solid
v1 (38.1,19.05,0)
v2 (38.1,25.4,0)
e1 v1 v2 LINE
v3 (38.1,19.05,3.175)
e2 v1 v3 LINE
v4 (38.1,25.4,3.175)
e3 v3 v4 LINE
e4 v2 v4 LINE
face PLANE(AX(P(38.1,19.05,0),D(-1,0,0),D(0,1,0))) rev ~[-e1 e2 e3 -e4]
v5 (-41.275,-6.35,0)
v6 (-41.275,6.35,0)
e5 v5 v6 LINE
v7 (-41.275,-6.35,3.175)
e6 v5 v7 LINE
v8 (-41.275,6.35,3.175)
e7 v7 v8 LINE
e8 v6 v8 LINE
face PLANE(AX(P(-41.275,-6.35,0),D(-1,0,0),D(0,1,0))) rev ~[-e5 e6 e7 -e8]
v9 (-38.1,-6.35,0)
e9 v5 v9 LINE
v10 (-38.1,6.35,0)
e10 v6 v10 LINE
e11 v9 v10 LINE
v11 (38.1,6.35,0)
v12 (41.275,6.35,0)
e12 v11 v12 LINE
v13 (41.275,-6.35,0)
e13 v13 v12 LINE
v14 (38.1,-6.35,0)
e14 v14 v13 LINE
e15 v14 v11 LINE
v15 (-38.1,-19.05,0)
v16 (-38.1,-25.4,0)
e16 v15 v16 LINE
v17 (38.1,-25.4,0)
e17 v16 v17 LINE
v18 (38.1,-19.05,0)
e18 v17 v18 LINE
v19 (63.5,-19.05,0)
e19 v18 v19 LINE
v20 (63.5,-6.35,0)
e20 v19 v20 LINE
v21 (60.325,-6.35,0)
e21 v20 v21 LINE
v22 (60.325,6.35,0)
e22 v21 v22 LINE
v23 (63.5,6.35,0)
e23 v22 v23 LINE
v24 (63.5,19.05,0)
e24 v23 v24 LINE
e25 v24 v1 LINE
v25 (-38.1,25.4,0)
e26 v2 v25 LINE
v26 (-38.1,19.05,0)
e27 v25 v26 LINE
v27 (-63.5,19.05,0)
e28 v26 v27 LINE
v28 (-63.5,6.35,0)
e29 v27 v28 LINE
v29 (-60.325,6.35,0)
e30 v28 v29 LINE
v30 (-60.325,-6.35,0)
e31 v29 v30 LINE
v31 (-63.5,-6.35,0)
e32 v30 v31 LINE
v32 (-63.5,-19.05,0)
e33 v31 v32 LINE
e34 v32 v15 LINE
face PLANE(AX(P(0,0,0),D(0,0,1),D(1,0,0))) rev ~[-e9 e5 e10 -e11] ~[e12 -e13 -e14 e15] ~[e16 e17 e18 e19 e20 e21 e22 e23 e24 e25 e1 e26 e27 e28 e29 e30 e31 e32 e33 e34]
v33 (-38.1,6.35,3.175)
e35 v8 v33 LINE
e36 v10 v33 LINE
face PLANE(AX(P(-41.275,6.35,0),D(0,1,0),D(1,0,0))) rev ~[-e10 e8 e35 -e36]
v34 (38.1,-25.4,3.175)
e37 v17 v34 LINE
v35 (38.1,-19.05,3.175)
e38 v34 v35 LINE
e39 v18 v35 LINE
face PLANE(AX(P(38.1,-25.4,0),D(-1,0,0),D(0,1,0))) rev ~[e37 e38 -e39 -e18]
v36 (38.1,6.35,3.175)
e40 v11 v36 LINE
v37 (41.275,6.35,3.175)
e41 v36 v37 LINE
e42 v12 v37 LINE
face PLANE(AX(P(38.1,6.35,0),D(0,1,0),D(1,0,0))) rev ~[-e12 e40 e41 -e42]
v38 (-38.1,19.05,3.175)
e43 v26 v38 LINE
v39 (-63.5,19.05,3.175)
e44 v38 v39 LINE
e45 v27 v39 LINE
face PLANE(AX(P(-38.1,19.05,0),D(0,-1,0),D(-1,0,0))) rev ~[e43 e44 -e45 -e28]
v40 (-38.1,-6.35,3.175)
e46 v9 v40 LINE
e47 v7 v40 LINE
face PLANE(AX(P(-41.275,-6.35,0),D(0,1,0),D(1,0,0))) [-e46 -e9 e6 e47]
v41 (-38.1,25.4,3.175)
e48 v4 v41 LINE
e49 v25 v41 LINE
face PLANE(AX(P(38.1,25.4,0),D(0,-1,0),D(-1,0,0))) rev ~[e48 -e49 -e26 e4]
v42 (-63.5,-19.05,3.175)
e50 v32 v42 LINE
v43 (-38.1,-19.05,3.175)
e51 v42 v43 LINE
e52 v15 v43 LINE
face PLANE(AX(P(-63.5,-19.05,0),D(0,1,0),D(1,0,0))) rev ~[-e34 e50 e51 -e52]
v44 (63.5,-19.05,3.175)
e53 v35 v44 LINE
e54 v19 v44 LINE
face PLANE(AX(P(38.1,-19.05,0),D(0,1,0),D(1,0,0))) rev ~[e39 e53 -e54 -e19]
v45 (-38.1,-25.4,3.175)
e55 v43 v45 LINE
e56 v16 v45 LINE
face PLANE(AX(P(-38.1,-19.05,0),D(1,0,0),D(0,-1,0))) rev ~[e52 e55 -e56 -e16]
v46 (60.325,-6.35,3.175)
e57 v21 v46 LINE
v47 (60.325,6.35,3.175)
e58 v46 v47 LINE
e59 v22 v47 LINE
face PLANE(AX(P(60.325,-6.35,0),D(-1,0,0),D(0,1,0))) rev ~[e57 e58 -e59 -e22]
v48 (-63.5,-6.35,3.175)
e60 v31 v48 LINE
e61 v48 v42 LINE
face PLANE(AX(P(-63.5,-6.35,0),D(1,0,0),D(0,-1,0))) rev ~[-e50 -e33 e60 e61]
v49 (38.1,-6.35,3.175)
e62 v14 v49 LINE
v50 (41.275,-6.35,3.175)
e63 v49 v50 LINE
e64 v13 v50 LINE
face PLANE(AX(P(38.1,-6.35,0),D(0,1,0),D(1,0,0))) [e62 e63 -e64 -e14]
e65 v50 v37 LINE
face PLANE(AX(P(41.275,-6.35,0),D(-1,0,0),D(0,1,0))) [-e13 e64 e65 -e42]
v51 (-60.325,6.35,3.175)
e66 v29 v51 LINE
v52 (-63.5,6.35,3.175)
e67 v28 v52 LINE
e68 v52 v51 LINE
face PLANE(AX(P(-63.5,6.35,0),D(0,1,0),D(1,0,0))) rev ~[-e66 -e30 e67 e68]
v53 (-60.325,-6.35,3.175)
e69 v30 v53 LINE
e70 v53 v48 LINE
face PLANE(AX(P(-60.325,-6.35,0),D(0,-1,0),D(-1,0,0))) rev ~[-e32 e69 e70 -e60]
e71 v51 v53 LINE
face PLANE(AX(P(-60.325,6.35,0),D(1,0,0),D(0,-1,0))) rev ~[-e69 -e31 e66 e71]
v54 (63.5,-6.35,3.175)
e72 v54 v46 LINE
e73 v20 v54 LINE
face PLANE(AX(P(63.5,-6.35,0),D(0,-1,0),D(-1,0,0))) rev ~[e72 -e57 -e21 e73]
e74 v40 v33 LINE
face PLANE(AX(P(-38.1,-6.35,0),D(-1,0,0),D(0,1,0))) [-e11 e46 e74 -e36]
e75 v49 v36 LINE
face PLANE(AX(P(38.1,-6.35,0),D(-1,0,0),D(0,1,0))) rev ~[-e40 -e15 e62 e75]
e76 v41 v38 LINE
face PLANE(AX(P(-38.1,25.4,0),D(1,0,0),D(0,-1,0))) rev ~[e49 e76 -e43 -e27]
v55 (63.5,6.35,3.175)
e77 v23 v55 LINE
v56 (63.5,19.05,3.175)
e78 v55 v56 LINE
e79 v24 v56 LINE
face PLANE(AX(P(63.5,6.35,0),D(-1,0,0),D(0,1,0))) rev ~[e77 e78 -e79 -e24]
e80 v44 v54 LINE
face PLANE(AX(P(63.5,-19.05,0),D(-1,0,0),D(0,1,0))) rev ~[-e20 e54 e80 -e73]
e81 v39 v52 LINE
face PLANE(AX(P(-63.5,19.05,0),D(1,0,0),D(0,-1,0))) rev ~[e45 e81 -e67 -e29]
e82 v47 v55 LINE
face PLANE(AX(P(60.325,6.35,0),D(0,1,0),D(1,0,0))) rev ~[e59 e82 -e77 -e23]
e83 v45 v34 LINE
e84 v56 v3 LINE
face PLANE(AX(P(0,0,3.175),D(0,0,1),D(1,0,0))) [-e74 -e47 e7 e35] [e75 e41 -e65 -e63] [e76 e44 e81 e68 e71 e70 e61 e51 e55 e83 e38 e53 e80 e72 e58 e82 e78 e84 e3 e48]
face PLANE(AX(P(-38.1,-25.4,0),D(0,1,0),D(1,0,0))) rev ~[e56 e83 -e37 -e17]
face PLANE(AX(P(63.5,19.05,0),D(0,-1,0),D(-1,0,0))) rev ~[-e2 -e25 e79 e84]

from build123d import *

# Parameters (mm, degrees)
F0_W     = 3.175
F0_H     = 12.7
F1_DEPTH = 3.175


# Not quite as in the source:
# - a feature names something its author has since deleted; it is built from what else it names


with BuildPart() as f1:
    # F0 (on Top) → F1 (new body)
    with BuildSketch(Plane.XY):
        Polygon((38.1, 19.05), (38.1, 25.4), (-38.1, 25.4), (-38.1, 19.05), (-63.5, 19.05), (-63.5, 6.35), (-60.325, 6.35), (-60.325, -6.35), (-63.5, -6.35), (-63.5, -19.05), (-38.1, -19.05), (-38.1, -25.4), (38.1, -25.4), (38.1, -19.05), (63.5, -19.05), (63.5, -6.35), (60.325, -6.35), (60.325, 6.35), (63.5, 6.35), (63.5, 19.05), align=None)
        with Locations((-39.6875, 0)):
            Rectangle(F0_W, F0_H, mode=Mode.SUBTRACT)
        with Locations((39.6875, 0)):
            Rectangle(F0_W, F0_H, mode=Mode.SUBTRACT)
    extrude(amount=F1_DEPTH)


solid = f1.part
